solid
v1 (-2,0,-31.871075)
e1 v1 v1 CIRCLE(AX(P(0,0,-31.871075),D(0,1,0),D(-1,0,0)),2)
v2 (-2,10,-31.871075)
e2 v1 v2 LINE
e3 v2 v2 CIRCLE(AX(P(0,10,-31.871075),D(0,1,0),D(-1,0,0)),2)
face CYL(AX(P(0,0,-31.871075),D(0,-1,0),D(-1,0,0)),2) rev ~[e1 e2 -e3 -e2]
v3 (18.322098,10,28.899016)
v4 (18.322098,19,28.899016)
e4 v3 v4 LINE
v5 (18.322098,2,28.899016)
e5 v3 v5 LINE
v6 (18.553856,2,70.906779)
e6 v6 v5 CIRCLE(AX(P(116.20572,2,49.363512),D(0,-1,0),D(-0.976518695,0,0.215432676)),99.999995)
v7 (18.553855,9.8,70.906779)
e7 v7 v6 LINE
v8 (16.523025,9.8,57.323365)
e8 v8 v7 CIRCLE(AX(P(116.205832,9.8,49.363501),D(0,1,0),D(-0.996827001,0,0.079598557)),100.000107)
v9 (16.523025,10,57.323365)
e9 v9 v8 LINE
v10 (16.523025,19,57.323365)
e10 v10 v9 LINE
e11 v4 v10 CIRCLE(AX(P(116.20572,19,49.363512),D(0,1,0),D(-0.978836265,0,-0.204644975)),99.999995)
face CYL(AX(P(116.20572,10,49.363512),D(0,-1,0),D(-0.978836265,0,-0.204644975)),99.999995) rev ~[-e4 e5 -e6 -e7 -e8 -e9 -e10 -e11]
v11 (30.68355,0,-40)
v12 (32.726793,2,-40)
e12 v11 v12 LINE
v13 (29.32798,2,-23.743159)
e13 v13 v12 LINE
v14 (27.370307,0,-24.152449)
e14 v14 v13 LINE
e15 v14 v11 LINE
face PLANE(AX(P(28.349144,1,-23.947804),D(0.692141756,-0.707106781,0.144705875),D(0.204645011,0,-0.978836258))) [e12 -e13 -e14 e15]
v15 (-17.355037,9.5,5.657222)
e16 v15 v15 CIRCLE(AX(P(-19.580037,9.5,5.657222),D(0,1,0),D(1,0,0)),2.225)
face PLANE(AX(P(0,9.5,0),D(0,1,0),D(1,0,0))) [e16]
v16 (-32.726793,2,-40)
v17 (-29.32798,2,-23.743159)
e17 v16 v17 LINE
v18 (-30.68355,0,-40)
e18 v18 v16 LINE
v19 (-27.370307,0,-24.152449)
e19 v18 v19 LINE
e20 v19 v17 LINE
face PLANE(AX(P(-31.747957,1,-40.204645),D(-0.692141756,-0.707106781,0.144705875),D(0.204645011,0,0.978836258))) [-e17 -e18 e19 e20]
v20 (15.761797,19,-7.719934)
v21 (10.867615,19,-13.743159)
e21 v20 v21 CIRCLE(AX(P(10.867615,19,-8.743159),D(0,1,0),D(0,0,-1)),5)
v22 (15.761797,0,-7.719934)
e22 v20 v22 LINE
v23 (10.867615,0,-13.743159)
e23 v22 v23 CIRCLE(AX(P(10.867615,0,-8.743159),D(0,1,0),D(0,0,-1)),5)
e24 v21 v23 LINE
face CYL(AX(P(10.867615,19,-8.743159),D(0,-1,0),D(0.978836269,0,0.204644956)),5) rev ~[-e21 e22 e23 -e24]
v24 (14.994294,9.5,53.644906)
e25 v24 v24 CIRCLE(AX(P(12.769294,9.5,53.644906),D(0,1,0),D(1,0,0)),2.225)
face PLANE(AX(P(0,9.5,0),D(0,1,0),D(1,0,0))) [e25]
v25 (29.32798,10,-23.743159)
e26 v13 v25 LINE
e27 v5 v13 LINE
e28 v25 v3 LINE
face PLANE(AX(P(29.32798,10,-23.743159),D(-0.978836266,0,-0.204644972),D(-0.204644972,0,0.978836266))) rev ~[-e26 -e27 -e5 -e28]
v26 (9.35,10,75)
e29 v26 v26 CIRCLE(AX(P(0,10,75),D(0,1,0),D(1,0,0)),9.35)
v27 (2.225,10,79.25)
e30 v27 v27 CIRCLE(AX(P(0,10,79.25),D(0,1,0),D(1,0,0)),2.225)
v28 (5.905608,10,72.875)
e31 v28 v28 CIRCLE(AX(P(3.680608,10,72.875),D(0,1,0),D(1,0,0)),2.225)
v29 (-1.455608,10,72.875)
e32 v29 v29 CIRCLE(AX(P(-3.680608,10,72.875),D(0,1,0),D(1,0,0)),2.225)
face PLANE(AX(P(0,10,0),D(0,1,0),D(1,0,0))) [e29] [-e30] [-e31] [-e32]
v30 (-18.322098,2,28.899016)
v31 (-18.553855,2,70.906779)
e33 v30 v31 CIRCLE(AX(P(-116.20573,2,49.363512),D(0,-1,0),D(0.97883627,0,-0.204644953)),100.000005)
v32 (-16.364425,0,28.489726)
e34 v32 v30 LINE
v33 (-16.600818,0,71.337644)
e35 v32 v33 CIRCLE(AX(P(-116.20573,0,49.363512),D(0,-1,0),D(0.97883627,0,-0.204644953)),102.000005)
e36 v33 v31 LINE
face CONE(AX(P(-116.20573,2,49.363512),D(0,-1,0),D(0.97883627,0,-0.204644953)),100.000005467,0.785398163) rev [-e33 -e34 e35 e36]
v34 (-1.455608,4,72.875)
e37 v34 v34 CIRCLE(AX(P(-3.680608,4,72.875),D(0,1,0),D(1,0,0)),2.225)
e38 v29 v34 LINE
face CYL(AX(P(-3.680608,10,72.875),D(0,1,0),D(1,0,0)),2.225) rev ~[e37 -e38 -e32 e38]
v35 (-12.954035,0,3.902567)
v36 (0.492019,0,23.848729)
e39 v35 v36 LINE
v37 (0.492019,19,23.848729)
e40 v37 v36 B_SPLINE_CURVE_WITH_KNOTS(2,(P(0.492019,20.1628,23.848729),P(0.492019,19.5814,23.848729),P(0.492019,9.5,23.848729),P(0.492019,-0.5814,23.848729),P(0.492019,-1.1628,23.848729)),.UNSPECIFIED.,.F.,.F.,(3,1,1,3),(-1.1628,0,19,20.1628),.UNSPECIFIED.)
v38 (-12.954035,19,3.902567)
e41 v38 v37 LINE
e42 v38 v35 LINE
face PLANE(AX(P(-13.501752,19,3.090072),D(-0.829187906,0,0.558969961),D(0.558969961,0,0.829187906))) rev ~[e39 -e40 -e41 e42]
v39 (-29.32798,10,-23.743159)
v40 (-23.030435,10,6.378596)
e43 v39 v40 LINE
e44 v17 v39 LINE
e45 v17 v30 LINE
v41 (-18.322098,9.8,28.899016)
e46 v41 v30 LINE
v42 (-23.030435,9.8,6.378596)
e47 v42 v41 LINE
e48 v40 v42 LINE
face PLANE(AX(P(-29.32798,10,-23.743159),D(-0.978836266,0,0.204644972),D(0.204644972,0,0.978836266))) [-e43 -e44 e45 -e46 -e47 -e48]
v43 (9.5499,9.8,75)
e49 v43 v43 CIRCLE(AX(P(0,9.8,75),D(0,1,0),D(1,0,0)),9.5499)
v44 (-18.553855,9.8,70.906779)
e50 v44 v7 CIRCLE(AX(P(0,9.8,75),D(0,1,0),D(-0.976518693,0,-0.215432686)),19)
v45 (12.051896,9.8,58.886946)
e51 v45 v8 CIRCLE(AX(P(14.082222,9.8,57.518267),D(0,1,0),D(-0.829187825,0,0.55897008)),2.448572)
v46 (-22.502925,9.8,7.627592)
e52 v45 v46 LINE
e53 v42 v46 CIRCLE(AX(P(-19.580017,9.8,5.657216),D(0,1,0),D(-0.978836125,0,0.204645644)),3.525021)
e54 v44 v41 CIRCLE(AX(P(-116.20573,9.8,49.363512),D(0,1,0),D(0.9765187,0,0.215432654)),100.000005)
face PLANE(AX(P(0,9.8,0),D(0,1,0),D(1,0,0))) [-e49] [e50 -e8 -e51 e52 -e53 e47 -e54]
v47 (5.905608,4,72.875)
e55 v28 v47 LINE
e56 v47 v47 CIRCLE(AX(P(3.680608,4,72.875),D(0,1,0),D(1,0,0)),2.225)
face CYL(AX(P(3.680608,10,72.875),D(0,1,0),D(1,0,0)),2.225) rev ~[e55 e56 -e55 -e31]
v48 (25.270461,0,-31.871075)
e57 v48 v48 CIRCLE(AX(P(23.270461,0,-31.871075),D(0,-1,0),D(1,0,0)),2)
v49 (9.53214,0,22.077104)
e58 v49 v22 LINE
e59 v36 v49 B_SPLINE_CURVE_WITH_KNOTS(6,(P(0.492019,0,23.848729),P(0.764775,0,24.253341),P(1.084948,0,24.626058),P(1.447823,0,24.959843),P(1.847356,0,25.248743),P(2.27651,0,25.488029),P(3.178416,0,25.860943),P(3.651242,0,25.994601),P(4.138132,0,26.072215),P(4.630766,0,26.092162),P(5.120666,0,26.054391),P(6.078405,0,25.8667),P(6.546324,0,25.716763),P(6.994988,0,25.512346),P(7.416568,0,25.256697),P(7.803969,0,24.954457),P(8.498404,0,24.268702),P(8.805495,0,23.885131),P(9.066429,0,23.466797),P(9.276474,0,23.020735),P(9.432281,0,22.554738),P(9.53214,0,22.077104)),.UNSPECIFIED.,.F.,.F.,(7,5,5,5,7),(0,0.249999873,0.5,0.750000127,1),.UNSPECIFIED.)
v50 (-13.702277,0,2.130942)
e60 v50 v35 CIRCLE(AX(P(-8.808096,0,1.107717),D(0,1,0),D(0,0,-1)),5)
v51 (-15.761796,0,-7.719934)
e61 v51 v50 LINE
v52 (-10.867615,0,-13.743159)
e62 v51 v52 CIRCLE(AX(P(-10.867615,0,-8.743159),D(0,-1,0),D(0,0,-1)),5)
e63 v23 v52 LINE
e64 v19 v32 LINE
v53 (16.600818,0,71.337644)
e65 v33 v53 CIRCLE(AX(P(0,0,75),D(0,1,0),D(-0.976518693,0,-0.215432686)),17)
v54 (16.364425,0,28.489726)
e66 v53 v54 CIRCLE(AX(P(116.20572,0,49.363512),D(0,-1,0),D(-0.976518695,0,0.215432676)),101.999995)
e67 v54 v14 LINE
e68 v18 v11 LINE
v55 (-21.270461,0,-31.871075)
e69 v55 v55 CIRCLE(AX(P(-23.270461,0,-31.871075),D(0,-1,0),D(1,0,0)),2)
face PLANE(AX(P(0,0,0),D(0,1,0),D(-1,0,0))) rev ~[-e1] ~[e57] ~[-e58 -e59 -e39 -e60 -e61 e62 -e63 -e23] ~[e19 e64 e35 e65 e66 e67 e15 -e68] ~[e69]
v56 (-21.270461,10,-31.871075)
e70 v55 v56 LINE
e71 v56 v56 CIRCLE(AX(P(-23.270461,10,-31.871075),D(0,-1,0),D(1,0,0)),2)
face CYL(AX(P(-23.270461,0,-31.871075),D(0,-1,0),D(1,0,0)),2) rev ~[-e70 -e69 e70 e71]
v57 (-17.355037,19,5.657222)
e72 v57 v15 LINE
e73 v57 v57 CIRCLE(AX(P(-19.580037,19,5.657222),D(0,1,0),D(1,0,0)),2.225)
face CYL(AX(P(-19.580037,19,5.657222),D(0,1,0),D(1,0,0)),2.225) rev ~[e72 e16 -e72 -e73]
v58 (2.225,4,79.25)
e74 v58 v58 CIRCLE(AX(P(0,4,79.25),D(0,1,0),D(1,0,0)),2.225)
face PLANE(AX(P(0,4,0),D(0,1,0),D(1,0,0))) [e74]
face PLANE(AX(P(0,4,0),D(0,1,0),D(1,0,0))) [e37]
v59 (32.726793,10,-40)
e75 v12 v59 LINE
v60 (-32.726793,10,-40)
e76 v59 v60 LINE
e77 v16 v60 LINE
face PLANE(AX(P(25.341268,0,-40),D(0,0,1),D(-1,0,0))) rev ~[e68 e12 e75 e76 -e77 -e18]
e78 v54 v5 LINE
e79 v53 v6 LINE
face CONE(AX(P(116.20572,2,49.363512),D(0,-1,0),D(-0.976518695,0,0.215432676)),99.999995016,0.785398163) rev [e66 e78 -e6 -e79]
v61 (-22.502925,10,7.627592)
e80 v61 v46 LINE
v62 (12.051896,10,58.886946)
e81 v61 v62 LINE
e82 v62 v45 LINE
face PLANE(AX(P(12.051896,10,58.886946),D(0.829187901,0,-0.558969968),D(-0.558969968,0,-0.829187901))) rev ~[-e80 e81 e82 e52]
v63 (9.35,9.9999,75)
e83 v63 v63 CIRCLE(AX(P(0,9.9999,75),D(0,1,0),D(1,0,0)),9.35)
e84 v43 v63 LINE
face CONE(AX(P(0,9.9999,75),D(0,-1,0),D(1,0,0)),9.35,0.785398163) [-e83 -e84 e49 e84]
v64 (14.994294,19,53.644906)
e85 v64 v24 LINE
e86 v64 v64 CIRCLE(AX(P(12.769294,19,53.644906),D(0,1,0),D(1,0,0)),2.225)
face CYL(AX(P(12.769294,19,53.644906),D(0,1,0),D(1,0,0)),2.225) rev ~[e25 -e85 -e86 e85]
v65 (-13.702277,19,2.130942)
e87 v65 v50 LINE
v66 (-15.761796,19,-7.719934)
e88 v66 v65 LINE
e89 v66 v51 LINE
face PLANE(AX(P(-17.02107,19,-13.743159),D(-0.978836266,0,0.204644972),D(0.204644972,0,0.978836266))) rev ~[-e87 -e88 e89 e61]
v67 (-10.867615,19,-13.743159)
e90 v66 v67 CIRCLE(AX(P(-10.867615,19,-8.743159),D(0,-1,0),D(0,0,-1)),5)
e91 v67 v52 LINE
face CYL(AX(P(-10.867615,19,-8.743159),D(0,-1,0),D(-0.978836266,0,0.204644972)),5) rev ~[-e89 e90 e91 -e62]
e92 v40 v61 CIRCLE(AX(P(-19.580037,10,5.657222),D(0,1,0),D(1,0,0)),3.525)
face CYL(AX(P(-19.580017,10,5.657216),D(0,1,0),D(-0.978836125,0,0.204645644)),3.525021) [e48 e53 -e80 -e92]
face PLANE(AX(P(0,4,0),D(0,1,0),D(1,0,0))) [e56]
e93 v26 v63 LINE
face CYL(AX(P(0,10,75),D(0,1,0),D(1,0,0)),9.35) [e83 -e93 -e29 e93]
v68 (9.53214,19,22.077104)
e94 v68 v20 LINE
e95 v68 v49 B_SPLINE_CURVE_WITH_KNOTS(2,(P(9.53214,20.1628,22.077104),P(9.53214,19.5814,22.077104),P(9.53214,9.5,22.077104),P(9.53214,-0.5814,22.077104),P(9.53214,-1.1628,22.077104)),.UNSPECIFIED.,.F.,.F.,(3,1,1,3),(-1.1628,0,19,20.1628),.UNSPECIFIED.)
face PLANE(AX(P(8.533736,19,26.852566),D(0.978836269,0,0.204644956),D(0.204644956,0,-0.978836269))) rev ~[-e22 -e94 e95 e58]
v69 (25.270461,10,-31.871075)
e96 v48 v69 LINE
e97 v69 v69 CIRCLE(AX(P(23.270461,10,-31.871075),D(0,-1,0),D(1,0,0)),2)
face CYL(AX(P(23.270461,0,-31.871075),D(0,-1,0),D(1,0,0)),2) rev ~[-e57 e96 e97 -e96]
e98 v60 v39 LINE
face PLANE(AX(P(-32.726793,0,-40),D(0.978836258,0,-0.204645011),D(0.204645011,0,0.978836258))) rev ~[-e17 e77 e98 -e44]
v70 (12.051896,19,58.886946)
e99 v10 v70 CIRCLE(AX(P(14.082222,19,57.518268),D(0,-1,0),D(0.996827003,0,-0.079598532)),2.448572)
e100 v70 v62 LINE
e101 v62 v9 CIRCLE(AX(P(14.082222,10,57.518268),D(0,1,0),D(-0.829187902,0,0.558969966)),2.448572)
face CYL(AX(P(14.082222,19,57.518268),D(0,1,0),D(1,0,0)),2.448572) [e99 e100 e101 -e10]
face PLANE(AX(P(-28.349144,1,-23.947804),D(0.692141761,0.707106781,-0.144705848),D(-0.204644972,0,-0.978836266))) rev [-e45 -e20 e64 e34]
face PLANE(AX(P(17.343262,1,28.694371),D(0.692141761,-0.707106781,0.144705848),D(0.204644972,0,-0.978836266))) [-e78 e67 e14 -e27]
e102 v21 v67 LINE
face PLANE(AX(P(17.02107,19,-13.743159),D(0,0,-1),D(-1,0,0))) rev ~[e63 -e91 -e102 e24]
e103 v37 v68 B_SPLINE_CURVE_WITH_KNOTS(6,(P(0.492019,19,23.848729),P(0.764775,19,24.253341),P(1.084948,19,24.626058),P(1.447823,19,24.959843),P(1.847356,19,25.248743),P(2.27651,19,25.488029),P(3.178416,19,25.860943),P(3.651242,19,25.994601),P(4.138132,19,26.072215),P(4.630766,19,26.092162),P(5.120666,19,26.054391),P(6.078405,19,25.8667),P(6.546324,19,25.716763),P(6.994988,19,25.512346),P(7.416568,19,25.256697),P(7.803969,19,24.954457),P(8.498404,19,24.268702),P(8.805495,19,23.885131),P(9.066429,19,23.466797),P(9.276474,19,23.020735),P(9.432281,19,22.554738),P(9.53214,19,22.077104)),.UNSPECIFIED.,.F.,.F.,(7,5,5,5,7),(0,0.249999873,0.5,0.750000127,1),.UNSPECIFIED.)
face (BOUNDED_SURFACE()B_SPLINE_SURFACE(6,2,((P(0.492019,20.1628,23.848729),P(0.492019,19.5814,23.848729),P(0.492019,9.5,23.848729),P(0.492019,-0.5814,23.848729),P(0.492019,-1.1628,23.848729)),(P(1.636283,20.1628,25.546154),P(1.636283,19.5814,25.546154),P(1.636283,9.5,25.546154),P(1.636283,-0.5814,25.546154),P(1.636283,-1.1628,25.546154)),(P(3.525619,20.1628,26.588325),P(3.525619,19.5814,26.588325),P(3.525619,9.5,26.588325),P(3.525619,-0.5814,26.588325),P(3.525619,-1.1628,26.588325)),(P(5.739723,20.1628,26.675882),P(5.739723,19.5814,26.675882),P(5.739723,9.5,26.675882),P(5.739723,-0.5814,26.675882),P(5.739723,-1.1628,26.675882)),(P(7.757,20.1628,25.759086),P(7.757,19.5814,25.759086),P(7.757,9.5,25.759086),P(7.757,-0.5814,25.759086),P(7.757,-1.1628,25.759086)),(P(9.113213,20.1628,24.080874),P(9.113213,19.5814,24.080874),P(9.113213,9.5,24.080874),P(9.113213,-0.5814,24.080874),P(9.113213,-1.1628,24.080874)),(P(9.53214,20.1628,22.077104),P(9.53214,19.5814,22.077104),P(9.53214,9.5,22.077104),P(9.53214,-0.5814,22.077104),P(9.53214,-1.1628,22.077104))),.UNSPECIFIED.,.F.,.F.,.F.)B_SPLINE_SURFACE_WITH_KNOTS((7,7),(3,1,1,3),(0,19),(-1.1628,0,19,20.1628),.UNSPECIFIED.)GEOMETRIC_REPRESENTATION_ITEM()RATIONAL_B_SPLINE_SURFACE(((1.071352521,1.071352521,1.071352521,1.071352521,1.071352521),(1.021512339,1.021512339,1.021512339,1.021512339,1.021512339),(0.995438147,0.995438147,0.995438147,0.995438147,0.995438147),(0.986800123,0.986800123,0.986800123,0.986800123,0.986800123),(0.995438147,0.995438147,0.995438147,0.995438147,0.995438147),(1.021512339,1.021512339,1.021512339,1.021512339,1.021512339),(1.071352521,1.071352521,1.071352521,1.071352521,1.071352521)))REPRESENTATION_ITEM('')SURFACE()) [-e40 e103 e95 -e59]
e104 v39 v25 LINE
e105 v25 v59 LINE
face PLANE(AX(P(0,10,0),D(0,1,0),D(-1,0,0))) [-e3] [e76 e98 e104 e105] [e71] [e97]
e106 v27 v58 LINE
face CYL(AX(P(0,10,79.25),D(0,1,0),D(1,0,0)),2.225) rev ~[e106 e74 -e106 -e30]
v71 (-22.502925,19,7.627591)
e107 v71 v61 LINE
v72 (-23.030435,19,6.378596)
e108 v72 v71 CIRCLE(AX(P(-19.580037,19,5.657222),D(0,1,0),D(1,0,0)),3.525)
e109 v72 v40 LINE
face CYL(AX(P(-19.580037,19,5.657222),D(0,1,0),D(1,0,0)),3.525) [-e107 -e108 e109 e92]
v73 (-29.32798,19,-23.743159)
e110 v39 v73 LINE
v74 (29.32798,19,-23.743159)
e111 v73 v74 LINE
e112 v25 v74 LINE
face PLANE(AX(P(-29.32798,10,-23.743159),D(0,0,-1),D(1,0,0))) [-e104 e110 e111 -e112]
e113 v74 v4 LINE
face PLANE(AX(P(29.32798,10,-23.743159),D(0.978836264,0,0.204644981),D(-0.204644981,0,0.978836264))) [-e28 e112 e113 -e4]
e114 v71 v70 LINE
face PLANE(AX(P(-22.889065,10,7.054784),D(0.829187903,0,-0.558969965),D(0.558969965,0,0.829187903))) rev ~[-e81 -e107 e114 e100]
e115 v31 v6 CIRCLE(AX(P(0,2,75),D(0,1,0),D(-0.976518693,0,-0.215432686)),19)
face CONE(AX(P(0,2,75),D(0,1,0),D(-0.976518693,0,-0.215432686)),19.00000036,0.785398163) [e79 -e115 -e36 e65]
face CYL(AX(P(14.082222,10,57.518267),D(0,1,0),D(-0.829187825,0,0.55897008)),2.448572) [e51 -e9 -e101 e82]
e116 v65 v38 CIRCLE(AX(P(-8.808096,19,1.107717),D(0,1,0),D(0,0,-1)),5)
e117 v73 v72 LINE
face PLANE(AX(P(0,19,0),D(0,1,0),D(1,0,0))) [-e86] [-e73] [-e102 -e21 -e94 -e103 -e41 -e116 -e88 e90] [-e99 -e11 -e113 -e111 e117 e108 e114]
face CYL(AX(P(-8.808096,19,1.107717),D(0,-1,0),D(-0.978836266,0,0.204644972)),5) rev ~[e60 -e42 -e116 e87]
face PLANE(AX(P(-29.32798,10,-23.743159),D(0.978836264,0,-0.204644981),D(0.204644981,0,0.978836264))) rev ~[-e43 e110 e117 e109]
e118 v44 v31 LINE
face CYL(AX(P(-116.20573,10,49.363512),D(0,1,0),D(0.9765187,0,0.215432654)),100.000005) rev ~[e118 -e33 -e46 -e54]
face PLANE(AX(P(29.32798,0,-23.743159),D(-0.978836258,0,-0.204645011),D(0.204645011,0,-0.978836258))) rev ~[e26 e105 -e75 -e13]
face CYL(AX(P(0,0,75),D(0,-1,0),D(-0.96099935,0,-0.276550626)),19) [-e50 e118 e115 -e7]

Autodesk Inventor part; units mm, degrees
ref_plane "YZ Plane" through (0, 0, 0) normal (1, 0, 0) x (0, 1, 0)
ref_plane "XZ Plane" through (0, 0, 0) normal (0, 1, 0) x (-1, 0, 0)
ref_plane "XY Plane" through (0, 0, 0) normal (0, 0, 1) x (1, 0, 0)
sketch "Sketch1" plane through (0, 0, 0) normal (0, 1, 0) x (-1, 0, 0)
  line L0 (0, 75) -> (0, -75) construction
  arc A0 (18.258988, 69.745538) -> (-18.258988, 69.745538) centre (0, 75) ccw
  line L1 (0, -196.504208) -> (0, 248.158352) construction
  line L2 (-25.341268, -40) -> (25.341268, -40)
  line L3 (25.341268, -40) -> (20, -23.743159)
  line L4 (20, -23.743159) -> (-20, -23.743159)
  line L5 (-20, -23.743159) -> (-25.341268, -40)
  circle A1 centre (12, -31.871075) radius 2
  circle A2 centre (-12, -31.871075) radius 2
  circle A3 centre (0, -31.871075) radius 2
  circle A4 centre (0, -75) radius 23.5
  circle A5 centre (170.873428, 25.827072) radius 158.808057
  circle A6 centre (-170.873428, 25.827072) radius 158.808057
  point P0 (0, 0)
  dimension "d0" = 150
  dimension "d1" = 75
  dimension "d22" = 38
  dimension "d33" = 47
  dimension "d34" = 4
  dimension "d35" = 71.8118
  dimension "d36" = 71.8118
  dimension "d37" = 16.25684
  dimension "d38" = 35
  dimension "d39" = 35
  dimension "d40" = 0
  dimension "d41" = 48.15025
  dimension "d42" = 0
  dimension "d43" = 48.15025
  dimension "d44" = 0
  dimension "d45" = 8.12893
  dimension "d46" = 10.13733
  dimension "d47" = 8.12893
  dimension "d48" = 21.53777
  dimension "d49" = 8.12893
  dimension "d50" = 32.93821
  dimension "d51" = 0
  dimension "d52" = 16.25684
  dimension "d53" = 38.00145
  dimension "d54" = 16.25684
extrude "Extrusion1" add sketch "Sketch1" along normal blind 10 contours A5 L4 A6 A0 | L3 L2 L5 L4 | A1 | A2
sketch "Sketch4" plane through (0, 10, 0) normal (0, 1, 0) x (1, 0, 0)
  circle A0 centre (3.680608, -72.875) radius 1.5
  circle A1 centre (0, -79.25) radius 1.5
  circle A2 centre (-3.680608, -72.875) radius 1.5
  arc A3 (5.450881, -75.044363) -> (2.76386, -79.69842) centre (10.238345, -80.911111) ccw
  arc A4 (5.450881, -75.044363) -> (2.687021, -70.257217) centre (3.680608, -72.875) ccw
  arc A5 (-2.687021, -70.257217) -> (2.687021, -70.257217) centre (0, -63.177778) ccw
  arc A6 (-2.687021, -70.257217) -> (-5.450881, -75.044363) centre (-3.680608, -72.875) ccw
  arc A7 (-2.76386, -79.69842) -> (-5.450881, -75.044363) centre (-10.238345, -80.911111) ccw
  arc A8 (-2.76386, -79.69842) -> (2.76386, -79.69842) centre (0, -79.25) ccw
  point P0 (0, 0)
extrude "Extrusion4" cut sketch "Sketch4" against normal through all contours A0 | A1 | A2
sketch "Sketch5" plane through (0, 10, 0) normal (0, 1, 0) x (1, 0, 0)
  circle A0 centre (-3.680608, -72.875) radius 1.5
  circle A1 centre (-3.680608, -72.875) radius 2.225
  circle A2 centre (0, -79.25) radius 1.5
  circle A3 centre (0, -79.25) radius 2.225
  circle A4 centre (3.680608, -72.875) radius 1.5
  circle A5 centre (3.680608, -72.875) radius 2.225
  point P0 (0, 0)
  dimension "d69" = 4.45
  dimension "d70" = 4.45
  dimension "d71" = 4.45
extrude "Extrusion5" cut sketch "Sketch5" against normal blind 6 contours A0 | A1 | A2 | A3 | A4 | A5
sketch "Sketch6" plane through (0, 0, 0) normal (0, -1, 0) x (1, 0, 0)
  circle A0 centre (0, 79.25) radius 1.5
  circle A1 centre (3.680608, 72.875) radius 1.5
  circle A2 centre (-3.680608, 72.875) radius 1.5
  point P0 (0, 0)
extrude "Extrusion6" add sketch "Sketch6" against normal up to surface (4 mm away)
sketch "Sketch7" plane through (0, 0, 0) normal (0, -1, 0) x (1, 0, 0)
  circle A0 centre (23.270461, -31.871075) radius 2
  circle A1 centre (-23.270461, -31.871075) radius 2
  circle A2 centre (0, -31.871075) radius 2
  line L0 (-32.726793, -40) -> (32.726793, -40)
  line L1 (-29.32798, -23.743159) -> (29.32798, -23.743159)
  line L2 (-25.341268, -40) -> (-20, -23.743159)
  line L3 (20, -23.743159) -> (25.341268, -40)
  line L4 (29.32798, -23.743159) -> (32.726793, -40)
  line L5 (-32.726793, -40) -> (-29.32798, -23.743159)
  point P0 (0, 0)
  point P1 (22.130539, -30.227731)
  point P2 (23.327313, -33.870267)
  point P3 (-23.327313, -33.870267)
  point P4 (-22.130539, -30.227731)
extrude "Extrusion7" add sketch "Sketch7" against normal up to surface (10 mm away) contours A0 L3 | A0 L3 L1 L4 L0 | L2 A1 L0 L5 L1 | L2 A1 | A1 L2 picked at (24.149861, -31.36133)
sketch "Sketch8" plane through (0, 10, 0) normal (0, 1, 0) x (1, 0, 0)
  arc A0 (-18.258988, -69.745538) -> (18.258988, -69.745538) centre (0, -75) ccw
  line L0 (0, -75) -> (0, -57.620328) construction
  line L1 (-29.32798, 23.743159) -> (-32.726793, 40)
  line L2 (-29.32798, 23.743159) -> (-18.322098, -28.899016)
  arc A1 (-18.553855, -70.906779) -> (-18.322098, -28.899016) centre (-116.205725, -49.363513) ccw
  arc A2 (-18.258988, -69.745538) -> (18.258988, -69.745538) centre (0, -75) ccw
  circle A3 centre (0, -75) radius 19
  arc A4 (-18.258988, -69.745538) -> (-20, 23.743159) centre (-170.873428, -25.827072) ccw
  line L3 (-20, 23.743159) -> (-29.32798, 23.743159)
  arc A5 (20, 23.743159) -> (18.258988, -69.745538) centre (170.873428, -25.827072) ccw
  line L4 (29.32798, 23.743159) -> (20, 23.743159)
  line L5 (29.32798, 23.743159) -> (18.322098, -28.899016)
  arc A6 (18.322098, -28.899016) -> (18.553855, -70.906779) centre (116.205725, -49.363513) ccw
  point P0 (0, 0)
  point P1 (18.553855, -70.906779)
  point P2 (-18.553855, -70.906779)
  dimension "d80" = 100
extrude "Extrusion8" add sketch "Sketch8" against normal blind 10 contours A0 A1 L2 L3 A4 | A5 L4 L5 A6 A0
sketch "Sketch11" plane through (0, 0, 0) normal (0, -1, 0) x (1, 0, 0)
  circle A0 centre (23.270461, -31.871075) radius 2
  circle A1 centre (-23.270461, -31.871075) radius 2
  point P0 (0, 0)
extrude "Extrusion11" cut sketch "Sketch11" against normal through all
chamfer "Chamfer1" distance 2 angle 45 5 edges at (-25.5244, 0, -5.5505) (-16.2072, 0, 49.9152) (0, 0, 94) (16.2072, 0, 49.9152) (25.5244, 0, -5.5505)
sketch "Sketch17" plane through (0, 10, 0) normal (0, 1, 0) x (1, 0, 0)
  line L0 (-83.121979, 82.295999) -> (15.75457, -64.379571)
  line L1 (-29.32798, 23.743159) -> (29.32798, 23.743159)
  circle A0 centre (-23.270461, 31.871075) radius 2
  circle A1 centre (23.270461, 31.871075) radius 2
  circle A2 centre (0, 31.871075) radius 2
  arc A3 (-18.553855, -70.906779) -> (18.553855, -70.906779) centre (0, -75) ccw
  arc A4 (18.322098, -28.899016) -> (18.553855, -70.906779) centre (116.205725, -49.363513) ccw
  line L2 (32.726793, 40) -> (18.322098, -28.899016)
  line L3 (-32.726793, 40) -> (32.726793, 40)
  line L4 (-32.726793, 40) -> (-18.322098, -28.899016)
  arc A5 (-18.553855, -70.906779) -> (-18.322098, -28.899016) centre (-116.205725, -49.363513) ccw
  circle A6 centre (-3.680608, -72.875) radius 2.225
  circle A7 centre (0, -79.25) radius 2.225
  circle A8 centre (3.680608, -72.875) radius 2.225
  line L5 (15.75457, -64.379571) -> (17.86641, -67.512319)
  line L6 (-32.726793, 40) -> (-18.322098, -28.899016)
  point P0 (0, 0)
  point P1 (-22.889065, -7.054783)
extrude "Extrusion16" add sketch "Sketch17" along normal blind 9 contours L4 L1 L2 A4 L5 L0
sketch "Sketch18" plane through (0, 19, 0) normal (0, 1, 0) x (1, 0, 0)
  circle A0 centre (13.844472, -83.053003) radius 1.5
  circle A1 centre (-8.053003, -88.844472) radius 1.5
  circle A2 centre (8.053003, -61.155528) radius 1.5
  circle A3 centre (-13.844472, -66.946997) radius 1.5
  circle A4 centre (57.038778, -59.914319) radius 1.5
  circle A5 centre (0, -75) radius 12.1825
  line L0 (54.737573, -51.213489) -> (22.535282, -59.730387)
  arc A6 (59.339984, -68.61515) -> (54.737573, -51.213489) centre (57.038778, -59.914319) ccw
  line L1 (27.137693, -77.132048) -> (59.339984, -68.61515)
  arc A7 (27.137693, -77.132048) -> (15.997897, -85.250234) centre (31.995793, -95.500468) ccw
  arc A8 (8.838591, -58.180983) -> (15.997897, -85.250234) centre (0, -75) ccw
  arc A9 (8.838591, -58.180983) -> (22.535282, -59.730387) centre (17.677181, -41.361967) ccw
  arc A10 (18.322098, -28.899016) -> (17.86641, -67.512319) centre (116.205725, -49.363513) ccw
  line L2 (18.322098, -28.899016) -> (29.32798, 23.743159)
  line L3 (29.32798, 23.743159) -> (-29.32798, 23.743159)
  line L4 (-29.32798, 23.743159) -> (-22.889065, -7.054783)
  line L5 (-22.889065, -7.054783) -> (17.86641, -67.512319)
  circle A11 centre (-19.580037, -5.657222) radius 3.525
  circle A12 centre (14.082222, -57.518268) radius 2.448572
  arc A13 (18.322098, -28.899016) -> (17.86641, -67.512319) centre (116.205725, -49.363513) ccw
  point P0 (0, 0)
  point P1 (-22.502925, -7.627592)
  point P2 (-23.030435, -6.378596)
  point P3 (16.523025, -57.323365)
  point P4 (12.051896, -58.886946)
  dimension "d117" = 7.05
extrude "Extrusion17" cut sketch "Sketch18" against normal up to surface (9 mm away) contours A10 L5 A9 | A9 A12 A10 | A9 L5 A12 | L5 L4 A11
sketch "Sketch19" plane through (0, 19, 0) normal (0, 1, 0) x (1, 0, 0)
  arc A0 (-23.030435, -6.378596) -> (-22.502925, -7.627592) centre (-19.580037, -5.657222) ccw
  circle A1 centre (-19.580037, -5.657222) radius 2.225
  circle A2 centre (12.769294, -53.644906) radius 3.525 construction
  line L0 (-22.502925, -7.627592) -> (12.051896, -58.886946)
  arc A3 (18.322098, -28.899016) -> (16.523025, -57.323365) centre (116.205725, -49.363513) ccw
  circle A4 centre (12.769294, -53.644906) radius 2.225
  point P0 (0, 0)
  dimension "d120" = 4.45
  dimension "d121" = 7.05
  dimension "d122" = 4.45
extrude "Extrusion18" cut sketch "Sketch19" against normal blind 9.5
sketch "Sketch20" plane through (0, 19, 0) normal (0, 1, 0) x (1, 0, 0)
  circle A0 centre (-19.580037, -5.657222) radius 2.225
  circle A1 centre (12.769294, -53.644906) radius 2.225
  arc A2 (-23.030435, -6.378596) -> (-22.502925, -7.627592) centre (-19.580037, -5.657222) ccw
  line L0 (-22.502925, -7.627592) -> (12.051896, -58.886946)
  arc A3 (12.051896, -58.886946) -> (16.523025, -57.323365) centre (14.082222, -57.518268) ccw
  arc A4 (18.322098, -28.899016) -> (16.523025, -57.323365) centre (116.205725, -49.363513) ccw
  line L1 (18.322098, -28.899016) -> (29.32798, 23.743159)
  line L2 (29.32798, 23.743159) -> (-29.32798, 23.743159)
  line L3 (-29.32798, 23.743159) -> (-23.030435, -6.378596)
  line L4 (-13.501752, -3.090072) -> (7.292792, -33.93714)
  arc A5 (8.533736, -26.852566) -> (7.292792, -33.93714) centre (116.205725, -49.363513) ccw
  line L5 (8.533736, -26.852566) -> (17.02107, 13.743159)
  line L6 (17.02107, 13.743159) -> (-17.02107, 13.743159)
  line L7 (-17.02107, 13.743159) -> (-13.501752, -3.090072)
  point P0 (0, 0)
  dimension "d125" = 10
extrude "Extrusion19" cut sketch "Sketch20" against normal through all contours L7 L6 L5 A5 L4
fillet "Fillet2" radius 5 4 edges at (-13.5018, 9.5, 3.0901) (7.2928, 9.5, 33.9371) (-17.0211, 9.5, -13.7432) (17.0211, 9.5, -13.7432)
sketch "Sketch21" plane through (0, 10, 0) normal (0, 1, 0) x (1, 0, 0)
  line L0 (12.051896, -58.886946) -> (-22.502925, -7.627592)
  arc A0 (-23.030435, -6.378596) -> (-22.502925, -7.627592) centre (-19.580037, -5.657222) ccw
  line L1 (-23.030435, -6.378596) -> (-18.322098, -28.899016)
  arc A1 (-18.553855, -70.906779) -> (-18.322098, -28.899016) centre (-116.205725, -49.363513) ccw
  arc A2 (-18.553855, -70.906779) -> (18.553855, -70.906779) centre (0, -75) ccw
  arc A3 (16.523025, -57.323365) -> (18.553855, -70.906779) centre (116.205725, -49.363513) ccw
  arc A4 (12.051896, -58.886946) -> (16.523025, -57.323365) centre (14.082222, -57.518268) ccw
  circle A5 centre (-3.680608, -72.875) radius 2.225
  circle A6 centre (0, -79.25) radius 2.225
  circle A7 centre (3.680608, -72.875) radius 2.225
  circle A8 centre (0, -75) radius 8.5 construction
  circle A9 centre (0, -75) radius 9.35
  point P0 (0, 0)
  dimension "d129" = 17
  dimension "d130" = 0.85
extrude "Extrusion20" cut sketch "Sketch21" against normal blind 0.2 contours A4 A3 A2 A1 L1 A0 L0
chamfer "Chamfer2" distance 0.2 angle 45 1 edges at (-9.35, 9.8, 75)
equation "\"d1\" = 0.5 * d0"
properties part number "motion_thigh_bot_3DPrint"
